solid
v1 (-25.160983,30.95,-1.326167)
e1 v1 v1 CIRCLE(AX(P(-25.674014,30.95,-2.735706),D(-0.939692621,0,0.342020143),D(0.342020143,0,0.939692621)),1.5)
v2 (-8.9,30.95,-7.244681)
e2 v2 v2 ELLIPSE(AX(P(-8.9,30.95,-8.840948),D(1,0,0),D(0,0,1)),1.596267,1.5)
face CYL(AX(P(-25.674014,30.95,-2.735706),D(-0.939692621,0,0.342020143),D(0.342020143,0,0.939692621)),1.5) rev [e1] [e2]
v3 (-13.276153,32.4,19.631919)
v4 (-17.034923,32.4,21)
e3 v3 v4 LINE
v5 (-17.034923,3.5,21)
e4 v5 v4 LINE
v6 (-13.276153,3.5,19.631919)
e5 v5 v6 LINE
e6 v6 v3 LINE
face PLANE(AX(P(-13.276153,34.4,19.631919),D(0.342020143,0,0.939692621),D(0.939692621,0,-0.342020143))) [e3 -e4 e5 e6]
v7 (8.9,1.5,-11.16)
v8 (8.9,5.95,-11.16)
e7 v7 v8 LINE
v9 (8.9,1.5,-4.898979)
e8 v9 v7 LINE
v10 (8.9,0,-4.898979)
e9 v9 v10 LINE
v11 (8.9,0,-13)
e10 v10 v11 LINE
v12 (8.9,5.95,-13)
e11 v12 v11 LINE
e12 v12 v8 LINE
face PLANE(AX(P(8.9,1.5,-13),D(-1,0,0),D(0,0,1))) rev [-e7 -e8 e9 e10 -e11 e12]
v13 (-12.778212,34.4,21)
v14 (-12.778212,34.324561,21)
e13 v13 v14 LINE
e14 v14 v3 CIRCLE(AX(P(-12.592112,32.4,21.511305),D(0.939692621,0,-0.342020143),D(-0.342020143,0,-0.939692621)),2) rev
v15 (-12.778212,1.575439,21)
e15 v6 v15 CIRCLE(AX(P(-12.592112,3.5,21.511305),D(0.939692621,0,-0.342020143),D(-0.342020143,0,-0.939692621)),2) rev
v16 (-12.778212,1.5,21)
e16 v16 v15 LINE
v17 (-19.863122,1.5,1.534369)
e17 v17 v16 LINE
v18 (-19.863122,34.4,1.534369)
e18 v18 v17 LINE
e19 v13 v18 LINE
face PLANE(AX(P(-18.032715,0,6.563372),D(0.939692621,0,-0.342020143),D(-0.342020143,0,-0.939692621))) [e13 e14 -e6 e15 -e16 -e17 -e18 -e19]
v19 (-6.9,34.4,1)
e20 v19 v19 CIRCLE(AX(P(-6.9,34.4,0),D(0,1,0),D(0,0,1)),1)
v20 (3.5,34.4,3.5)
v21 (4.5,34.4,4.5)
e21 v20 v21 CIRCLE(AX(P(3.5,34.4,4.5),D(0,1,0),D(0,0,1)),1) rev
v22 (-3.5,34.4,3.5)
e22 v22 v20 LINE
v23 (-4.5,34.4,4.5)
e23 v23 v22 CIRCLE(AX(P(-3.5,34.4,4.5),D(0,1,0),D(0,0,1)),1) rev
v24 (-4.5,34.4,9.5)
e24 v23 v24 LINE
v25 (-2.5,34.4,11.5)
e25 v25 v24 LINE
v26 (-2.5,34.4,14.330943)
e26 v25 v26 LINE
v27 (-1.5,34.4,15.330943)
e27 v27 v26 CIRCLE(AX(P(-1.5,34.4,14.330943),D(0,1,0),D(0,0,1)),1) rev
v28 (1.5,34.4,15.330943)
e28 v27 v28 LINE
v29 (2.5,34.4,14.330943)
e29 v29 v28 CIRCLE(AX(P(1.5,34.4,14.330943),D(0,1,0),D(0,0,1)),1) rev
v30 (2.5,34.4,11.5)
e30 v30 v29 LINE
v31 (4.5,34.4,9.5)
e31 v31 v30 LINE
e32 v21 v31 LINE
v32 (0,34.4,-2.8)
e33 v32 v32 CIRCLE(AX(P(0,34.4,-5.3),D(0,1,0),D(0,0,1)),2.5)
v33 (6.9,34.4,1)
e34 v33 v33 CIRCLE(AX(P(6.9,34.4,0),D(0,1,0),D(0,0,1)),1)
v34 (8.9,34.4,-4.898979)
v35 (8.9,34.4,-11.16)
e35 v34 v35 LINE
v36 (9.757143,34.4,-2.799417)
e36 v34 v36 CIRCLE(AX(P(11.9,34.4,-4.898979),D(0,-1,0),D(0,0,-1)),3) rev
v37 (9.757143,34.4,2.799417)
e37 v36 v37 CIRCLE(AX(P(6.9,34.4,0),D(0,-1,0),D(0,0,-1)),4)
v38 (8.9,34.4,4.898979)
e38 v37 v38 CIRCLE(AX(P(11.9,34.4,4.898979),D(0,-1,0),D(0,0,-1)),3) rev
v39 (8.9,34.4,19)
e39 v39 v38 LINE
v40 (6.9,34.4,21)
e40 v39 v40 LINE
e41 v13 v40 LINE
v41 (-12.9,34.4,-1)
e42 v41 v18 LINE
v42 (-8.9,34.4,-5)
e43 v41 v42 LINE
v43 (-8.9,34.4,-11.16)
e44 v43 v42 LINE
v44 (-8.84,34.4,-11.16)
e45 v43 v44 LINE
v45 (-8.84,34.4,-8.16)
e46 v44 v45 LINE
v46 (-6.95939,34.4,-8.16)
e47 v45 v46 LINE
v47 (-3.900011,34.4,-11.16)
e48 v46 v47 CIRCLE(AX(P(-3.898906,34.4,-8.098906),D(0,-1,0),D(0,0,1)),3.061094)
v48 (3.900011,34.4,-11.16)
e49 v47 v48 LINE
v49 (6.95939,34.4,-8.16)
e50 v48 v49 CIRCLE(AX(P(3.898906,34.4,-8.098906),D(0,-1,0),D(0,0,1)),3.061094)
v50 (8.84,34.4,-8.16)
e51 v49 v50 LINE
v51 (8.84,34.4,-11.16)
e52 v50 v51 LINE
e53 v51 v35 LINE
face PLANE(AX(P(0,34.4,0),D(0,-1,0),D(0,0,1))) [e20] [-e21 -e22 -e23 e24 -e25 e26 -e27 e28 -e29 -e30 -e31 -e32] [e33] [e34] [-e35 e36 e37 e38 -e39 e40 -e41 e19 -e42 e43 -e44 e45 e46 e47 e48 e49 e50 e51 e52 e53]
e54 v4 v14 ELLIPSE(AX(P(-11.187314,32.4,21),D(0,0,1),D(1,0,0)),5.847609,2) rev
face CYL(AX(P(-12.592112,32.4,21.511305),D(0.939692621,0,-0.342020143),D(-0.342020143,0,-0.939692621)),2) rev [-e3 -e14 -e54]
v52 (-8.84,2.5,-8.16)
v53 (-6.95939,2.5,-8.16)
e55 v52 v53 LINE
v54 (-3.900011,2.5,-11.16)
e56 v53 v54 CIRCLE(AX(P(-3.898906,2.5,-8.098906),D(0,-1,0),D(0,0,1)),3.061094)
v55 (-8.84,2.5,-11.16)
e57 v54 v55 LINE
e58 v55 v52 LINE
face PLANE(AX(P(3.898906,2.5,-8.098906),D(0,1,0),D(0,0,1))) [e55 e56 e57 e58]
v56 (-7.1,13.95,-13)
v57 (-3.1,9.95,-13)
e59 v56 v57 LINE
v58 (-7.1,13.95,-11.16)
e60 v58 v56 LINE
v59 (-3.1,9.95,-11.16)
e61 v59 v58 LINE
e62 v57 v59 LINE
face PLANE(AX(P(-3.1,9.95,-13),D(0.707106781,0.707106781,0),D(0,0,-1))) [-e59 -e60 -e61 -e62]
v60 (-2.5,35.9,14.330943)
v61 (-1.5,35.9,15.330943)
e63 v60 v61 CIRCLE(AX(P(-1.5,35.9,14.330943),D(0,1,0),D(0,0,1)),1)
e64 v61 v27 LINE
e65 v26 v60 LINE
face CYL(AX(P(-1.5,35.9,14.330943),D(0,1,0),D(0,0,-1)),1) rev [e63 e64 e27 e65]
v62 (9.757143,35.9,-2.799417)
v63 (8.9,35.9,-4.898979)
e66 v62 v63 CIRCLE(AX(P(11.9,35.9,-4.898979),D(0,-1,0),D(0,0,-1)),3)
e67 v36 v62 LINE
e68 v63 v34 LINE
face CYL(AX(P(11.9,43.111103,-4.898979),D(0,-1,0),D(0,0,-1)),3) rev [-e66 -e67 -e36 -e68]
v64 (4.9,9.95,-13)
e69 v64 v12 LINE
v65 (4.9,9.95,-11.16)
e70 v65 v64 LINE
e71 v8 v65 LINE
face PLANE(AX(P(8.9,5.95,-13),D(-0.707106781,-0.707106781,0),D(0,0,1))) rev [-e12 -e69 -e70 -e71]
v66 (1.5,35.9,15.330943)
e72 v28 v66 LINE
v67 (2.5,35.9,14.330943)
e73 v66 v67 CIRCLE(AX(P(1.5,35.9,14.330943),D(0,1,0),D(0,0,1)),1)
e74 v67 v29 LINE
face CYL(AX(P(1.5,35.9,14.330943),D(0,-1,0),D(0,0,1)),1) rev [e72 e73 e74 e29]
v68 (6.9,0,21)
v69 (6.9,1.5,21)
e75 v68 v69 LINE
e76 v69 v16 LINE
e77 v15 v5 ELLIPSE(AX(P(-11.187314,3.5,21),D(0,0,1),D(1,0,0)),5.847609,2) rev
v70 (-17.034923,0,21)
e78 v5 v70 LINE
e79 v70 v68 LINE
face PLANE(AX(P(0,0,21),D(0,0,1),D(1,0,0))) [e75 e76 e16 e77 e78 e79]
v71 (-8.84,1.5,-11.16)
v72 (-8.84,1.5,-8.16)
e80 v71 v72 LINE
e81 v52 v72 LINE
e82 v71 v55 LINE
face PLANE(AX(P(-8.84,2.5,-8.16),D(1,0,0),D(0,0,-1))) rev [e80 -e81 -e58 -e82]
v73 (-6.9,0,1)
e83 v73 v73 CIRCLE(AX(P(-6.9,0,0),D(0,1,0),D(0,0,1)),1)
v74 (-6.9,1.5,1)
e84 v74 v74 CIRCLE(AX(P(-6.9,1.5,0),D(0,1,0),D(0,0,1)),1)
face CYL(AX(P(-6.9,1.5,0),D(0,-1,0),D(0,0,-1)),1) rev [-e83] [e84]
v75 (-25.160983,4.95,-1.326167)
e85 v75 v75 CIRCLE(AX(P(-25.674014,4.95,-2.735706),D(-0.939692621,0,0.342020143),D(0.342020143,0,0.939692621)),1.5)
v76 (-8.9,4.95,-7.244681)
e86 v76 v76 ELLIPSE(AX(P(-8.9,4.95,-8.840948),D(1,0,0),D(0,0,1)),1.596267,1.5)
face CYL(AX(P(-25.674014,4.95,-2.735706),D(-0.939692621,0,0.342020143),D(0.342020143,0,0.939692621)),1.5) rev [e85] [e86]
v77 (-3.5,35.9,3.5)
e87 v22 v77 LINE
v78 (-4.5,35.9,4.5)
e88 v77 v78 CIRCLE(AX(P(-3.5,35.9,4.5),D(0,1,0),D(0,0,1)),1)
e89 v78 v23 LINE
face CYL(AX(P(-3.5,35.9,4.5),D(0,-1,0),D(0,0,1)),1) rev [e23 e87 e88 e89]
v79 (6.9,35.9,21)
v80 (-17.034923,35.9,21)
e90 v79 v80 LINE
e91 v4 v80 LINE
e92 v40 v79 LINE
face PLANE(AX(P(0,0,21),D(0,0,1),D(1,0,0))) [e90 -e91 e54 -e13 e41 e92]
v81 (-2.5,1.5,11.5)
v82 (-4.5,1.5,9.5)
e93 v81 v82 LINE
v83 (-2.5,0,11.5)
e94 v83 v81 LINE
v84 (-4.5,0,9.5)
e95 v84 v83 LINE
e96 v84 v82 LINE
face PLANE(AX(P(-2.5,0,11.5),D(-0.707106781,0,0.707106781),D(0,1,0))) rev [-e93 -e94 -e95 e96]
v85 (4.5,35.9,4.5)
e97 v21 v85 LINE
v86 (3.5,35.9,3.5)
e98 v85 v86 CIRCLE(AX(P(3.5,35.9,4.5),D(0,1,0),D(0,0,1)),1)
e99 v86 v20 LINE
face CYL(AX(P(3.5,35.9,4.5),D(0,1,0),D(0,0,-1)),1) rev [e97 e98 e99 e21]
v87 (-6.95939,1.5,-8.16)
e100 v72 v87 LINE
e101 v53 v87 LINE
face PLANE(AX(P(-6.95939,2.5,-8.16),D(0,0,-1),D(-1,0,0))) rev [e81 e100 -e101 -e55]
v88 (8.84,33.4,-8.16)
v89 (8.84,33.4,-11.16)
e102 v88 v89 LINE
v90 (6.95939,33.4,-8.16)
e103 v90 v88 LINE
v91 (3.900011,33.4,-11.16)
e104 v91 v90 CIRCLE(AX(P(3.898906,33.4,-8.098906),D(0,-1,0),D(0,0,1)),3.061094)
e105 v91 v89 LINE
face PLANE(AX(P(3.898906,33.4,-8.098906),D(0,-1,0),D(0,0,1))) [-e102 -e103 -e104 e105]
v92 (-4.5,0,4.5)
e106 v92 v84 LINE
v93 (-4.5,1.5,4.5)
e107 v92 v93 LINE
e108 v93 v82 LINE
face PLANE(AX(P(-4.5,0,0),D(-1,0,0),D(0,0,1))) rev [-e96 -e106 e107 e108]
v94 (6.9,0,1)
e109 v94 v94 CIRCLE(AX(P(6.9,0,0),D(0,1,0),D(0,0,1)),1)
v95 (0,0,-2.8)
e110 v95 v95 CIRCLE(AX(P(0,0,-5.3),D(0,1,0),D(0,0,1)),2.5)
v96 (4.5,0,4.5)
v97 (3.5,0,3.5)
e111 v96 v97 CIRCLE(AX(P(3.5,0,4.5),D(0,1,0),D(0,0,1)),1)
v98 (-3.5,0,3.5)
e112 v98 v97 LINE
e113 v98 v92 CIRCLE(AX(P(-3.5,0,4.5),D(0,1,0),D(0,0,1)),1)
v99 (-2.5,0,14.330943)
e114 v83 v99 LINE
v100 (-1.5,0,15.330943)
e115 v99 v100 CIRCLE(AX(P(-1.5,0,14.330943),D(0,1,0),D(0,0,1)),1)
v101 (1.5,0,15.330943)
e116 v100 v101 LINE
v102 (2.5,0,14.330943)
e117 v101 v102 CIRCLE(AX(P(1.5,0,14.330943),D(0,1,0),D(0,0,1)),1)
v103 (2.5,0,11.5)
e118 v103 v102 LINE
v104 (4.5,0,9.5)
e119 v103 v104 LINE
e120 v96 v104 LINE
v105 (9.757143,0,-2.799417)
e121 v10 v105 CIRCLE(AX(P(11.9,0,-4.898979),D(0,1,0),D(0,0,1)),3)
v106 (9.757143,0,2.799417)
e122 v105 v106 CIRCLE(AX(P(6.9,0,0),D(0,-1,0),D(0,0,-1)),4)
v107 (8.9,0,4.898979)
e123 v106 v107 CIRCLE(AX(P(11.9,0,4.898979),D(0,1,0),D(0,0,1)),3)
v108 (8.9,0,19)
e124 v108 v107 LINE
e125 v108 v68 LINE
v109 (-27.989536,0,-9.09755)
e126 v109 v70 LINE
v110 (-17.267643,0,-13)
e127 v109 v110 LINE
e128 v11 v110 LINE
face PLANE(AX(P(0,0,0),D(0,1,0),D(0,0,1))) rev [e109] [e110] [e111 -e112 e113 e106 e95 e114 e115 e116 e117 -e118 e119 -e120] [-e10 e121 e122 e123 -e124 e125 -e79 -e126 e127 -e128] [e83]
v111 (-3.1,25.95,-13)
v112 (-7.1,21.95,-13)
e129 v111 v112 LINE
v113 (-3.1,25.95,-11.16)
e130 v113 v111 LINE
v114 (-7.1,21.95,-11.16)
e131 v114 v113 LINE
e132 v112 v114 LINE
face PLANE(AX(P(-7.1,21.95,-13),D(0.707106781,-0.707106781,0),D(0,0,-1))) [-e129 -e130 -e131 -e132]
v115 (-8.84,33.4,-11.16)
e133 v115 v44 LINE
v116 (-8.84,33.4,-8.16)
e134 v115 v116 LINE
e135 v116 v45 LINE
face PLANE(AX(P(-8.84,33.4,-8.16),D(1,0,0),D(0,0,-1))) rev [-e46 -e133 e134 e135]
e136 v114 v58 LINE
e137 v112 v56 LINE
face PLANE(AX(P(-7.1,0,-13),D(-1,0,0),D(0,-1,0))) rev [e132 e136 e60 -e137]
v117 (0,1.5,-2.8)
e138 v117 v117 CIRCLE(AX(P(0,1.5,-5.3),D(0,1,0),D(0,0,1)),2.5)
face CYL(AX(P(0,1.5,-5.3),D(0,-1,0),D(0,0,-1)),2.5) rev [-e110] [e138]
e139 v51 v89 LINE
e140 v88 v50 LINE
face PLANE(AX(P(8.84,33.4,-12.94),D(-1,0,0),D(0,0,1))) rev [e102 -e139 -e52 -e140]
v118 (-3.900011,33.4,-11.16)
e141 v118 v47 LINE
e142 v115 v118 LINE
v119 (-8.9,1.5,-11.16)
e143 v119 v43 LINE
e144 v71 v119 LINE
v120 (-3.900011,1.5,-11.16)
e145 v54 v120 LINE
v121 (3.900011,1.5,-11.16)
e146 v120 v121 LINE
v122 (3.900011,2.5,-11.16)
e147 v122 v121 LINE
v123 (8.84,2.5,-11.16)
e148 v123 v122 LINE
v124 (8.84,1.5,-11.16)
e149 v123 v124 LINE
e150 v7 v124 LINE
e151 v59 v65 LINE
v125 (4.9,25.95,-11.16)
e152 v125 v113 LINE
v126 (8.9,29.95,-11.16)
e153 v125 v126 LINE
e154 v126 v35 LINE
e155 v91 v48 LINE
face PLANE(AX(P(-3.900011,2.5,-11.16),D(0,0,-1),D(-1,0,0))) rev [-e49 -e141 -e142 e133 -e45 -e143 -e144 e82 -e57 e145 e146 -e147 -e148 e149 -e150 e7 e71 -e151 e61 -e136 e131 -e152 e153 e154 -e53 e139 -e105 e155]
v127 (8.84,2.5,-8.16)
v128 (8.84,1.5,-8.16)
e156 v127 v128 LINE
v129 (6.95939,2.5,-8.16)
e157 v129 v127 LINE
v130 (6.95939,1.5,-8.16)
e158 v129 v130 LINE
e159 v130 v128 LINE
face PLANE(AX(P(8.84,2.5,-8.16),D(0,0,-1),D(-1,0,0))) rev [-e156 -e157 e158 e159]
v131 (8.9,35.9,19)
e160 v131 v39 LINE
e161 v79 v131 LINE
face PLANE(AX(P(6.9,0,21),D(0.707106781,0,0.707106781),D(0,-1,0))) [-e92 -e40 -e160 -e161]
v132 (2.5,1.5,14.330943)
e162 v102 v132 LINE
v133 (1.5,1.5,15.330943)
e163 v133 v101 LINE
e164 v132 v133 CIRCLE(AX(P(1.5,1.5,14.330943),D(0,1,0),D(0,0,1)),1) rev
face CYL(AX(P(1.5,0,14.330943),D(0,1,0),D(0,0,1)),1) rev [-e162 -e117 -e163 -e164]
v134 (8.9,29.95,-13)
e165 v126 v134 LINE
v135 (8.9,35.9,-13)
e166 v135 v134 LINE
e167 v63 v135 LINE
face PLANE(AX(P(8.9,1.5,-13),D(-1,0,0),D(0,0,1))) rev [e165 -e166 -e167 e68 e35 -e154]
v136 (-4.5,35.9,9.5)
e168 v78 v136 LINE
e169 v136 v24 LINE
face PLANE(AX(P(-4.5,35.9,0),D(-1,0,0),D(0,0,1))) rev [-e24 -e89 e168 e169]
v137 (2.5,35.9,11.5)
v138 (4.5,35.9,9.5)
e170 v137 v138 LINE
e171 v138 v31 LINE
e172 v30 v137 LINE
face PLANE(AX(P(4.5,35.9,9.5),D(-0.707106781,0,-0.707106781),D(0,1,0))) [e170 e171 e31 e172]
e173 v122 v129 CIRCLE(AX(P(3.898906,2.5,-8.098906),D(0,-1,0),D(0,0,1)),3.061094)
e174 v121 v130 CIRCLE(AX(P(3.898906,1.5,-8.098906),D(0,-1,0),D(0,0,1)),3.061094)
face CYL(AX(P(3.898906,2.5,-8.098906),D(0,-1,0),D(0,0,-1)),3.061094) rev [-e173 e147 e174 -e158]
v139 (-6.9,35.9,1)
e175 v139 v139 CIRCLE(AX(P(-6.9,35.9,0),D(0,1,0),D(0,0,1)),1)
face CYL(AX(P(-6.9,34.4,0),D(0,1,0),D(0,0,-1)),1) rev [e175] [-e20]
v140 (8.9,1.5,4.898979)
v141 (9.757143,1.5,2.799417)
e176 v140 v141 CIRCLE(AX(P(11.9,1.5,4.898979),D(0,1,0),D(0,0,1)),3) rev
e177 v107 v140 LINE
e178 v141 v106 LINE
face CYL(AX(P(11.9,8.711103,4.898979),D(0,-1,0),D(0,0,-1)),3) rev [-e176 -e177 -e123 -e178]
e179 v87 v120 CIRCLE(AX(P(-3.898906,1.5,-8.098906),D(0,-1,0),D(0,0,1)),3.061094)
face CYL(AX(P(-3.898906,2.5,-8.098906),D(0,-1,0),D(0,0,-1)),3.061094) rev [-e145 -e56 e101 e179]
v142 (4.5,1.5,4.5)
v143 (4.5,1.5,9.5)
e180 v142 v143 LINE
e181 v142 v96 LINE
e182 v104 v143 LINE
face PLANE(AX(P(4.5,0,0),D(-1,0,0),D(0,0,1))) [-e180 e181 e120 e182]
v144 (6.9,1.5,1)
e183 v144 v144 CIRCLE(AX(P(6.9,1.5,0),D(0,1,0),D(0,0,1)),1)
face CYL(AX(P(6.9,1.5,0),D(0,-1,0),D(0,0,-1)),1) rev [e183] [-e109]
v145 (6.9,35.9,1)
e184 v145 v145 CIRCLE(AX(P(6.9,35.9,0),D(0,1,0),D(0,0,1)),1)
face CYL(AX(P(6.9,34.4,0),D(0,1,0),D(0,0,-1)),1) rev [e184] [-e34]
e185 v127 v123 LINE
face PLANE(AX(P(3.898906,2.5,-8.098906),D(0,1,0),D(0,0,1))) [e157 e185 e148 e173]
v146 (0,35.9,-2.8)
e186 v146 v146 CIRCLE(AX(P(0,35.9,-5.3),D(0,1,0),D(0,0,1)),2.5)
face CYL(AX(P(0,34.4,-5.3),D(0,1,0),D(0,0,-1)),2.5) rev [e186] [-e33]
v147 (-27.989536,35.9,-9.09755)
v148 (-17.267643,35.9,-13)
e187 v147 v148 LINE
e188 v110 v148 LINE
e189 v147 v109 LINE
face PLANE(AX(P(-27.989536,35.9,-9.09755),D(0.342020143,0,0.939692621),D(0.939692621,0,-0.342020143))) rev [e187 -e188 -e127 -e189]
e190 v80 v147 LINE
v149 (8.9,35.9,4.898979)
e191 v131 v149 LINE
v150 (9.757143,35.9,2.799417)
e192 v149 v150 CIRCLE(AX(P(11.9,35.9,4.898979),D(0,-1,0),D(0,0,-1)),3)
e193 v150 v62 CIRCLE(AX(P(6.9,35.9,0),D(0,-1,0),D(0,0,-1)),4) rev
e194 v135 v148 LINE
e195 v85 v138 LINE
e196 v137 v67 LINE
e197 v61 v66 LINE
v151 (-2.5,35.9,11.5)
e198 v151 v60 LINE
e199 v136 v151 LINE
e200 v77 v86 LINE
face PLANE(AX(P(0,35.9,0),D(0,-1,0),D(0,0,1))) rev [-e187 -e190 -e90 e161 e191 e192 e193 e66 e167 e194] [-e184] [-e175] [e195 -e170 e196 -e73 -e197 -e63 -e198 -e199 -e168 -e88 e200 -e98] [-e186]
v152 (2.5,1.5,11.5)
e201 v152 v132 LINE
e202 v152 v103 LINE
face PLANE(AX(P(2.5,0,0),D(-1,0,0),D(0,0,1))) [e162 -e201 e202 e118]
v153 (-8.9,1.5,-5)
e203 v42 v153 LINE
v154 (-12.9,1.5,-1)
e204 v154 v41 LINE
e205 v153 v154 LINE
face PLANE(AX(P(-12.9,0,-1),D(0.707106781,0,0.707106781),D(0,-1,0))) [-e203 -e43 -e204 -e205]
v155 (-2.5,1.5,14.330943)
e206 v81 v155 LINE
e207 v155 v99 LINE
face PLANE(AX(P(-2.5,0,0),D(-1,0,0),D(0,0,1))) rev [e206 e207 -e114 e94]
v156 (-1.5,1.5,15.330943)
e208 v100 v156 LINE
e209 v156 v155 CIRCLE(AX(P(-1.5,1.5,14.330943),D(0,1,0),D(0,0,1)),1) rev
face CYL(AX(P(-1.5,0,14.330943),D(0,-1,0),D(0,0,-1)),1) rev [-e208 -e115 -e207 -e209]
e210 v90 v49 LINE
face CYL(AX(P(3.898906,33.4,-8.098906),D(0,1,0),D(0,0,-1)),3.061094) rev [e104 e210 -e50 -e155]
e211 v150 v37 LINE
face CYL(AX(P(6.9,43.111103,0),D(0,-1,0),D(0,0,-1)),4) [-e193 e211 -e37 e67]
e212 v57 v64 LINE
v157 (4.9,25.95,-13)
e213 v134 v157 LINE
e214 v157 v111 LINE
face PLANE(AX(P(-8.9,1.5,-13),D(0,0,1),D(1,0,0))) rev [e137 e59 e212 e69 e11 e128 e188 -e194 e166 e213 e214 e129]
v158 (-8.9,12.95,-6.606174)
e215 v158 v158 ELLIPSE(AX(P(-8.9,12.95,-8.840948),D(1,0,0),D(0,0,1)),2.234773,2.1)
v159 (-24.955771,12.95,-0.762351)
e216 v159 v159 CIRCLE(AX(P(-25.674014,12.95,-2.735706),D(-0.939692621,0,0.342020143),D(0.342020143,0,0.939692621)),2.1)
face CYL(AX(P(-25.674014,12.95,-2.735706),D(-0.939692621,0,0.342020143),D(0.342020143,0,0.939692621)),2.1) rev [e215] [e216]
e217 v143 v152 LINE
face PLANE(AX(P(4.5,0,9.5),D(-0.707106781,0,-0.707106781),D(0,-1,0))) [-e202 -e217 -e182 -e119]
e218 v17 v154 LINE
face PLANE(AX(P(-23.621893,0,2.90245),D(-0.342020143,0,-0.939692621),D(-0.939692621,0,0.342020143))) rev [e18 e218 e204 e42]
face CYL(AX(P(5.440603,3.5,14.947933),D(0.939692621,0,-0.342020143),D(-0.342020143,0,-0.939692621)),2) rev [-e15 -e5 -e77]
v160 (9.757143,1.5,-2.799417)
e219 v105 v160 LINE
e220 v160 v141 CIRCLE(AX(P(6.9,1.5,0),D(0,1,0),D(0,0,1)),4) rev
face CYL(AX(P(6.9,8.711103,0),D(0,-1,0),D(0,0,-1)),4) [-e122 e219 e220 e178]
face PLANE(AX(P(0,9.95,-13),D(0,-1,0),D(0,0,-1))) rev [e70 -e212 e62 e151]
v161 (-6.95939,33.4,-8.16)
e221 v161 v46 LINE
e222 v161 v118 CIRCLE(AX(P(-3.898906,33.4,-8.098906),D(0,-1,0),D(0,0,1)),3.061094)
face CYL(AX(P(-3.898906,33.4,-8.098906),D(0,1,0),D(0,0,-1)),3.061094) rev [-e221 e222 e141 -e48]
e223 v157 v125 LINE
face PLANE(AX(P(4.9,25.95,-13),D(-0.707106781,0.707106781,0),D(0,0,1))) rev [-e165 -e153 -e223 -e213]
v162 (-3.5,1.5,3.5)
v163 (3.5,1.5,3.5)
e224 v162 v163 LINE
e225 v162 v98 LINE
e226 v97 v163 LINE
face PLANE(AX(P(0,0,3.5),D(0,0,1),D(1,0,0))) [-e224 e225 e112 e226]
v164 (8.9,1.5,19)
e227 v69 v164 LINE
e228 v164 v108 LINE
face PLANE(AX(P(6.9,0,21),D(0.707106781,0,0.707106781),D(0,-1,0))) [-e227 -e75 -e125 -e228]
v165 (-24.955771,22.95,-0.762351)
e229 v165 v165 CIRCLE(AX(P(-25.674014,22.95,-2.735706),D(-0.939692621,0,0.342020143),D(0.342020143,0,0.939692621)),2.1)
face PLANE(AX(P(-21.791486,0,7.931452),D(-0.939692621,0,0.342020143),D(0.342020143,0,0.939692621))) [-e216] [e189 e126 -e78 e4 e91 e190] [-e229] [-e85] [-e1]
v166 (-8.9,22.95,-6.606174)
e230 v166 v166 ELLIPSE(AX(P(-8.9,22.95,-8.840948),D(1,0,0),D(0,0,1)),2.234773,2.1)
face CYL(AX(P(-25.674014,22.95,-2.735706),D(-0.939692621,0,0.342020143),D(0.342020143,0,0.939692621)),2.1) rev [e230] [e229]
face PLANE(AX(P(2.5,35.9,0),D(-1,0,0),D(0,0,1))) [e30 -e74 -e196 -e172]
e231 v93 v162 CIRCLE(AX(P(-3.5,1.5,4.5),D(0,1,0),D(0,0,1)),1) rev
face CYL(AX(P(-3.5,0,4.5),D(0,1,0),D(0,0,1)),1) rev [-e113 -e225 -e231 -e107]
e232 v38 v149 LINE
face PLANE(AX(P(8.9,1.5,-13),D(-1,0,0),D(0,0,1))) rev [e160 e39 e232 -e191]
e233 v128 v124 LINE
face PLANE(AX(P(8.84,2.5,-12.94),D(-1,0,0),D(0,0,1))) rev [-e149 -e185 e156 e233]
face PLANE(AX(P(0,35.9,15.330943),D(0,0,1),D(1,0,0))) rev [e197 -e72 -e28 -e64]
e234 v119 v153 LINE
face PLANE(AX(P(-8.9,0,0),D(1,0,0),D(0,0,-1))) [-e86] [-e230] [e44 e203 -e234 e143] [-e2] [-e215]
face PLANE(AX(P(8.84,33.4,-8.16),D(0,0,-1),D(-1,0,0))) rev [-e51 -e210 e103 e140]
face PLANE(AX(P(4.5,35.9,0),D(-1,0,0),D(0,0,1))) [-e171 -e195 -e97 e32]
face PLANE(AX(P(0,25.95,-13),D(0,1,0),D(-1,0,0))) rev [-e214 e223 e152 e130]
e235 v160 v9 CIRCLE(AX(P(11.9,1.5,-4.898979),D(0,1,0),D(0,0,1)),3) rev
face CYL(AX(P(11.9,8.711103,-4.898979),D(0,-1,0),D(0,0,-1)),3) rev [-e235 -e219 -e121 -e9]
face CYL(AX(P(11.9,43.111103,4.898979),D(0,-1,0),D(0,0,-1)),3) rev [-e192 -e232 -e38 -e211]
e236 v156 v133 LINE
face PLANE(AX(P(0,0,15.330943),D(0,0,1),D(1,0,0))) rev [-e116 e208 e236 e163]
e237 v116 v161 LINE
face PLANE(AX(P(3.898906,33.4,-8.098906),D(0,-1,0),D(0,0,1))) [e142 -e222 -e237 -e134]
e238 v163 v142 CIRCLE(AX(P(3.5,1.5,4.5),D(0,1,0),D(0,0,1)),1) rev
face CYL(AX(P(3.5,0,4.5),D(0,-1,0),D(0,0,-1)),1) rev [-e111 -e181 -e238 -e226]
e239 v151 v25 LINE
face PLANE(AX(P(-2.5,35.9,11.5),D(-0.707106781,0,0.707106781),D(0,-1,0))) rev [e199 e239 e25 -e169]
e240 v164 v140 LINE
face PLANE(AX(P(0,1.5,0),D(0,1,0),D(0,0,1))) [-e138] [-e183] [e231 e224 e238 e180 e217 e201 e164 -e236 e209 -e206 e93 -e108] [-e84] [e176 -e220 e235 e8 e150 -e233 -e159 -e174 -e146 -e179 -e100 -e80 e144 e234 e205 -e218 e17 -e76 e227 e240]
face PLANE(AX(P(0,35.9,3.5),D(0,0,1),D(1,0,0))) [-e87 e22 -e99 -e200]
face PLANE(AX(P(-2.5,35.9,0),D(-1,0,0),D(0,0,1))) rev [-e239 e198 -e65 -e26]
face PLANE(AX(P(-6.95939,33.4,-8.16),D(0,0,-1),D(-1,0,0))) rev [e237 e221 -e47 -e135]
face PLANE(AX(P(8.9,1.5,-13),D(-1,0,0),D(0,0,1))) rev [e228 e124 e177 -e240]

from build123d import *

# Parameters (mm, degrees)
SKETCH1_W                  = 17.8
SKETCH1_H                  = 30
SKETCH1_R                  = 1
SKETCH1_R_2                = 2.5
BOSS_EXTRUDE1_DEPTH        = 1.5
SKETCH2_W                  = 9
SKETCH2_H                  = 6
SKETCH2_W_2                = 5
SKETCH2_H_2                = 5.830943002
CUT_EXTRUDE1_DEPTH         = 20.247337478
CHAMFER1_SIZE              = 2
FILLET1_R                  = 1
BOSS_EXTRUDE2_DEPTH        = 1
SKETCH4_W                  = 12
SKETCH4_H                  = 17.95
BOSS_EXTRUDE3_DEPTH        = 4
BOSS_EXTRUDE4_DEPTH        = 35.9
SKETCH6_W                  = 12.770133269
SKETCH6_H                  = 35.9
BOSS_EXTRUDE5_DEPTH        = 11.41
F_3_0_MM_DOWEL_HOLES1_D    = 3
F_4_2_4_2_DIAMETER_HOLE1_D = 4.2
SKETCH12_W                 = 17.8
SKETCH12_H                 = 1.5
BOSS_EXTRUDE6_DEPTH        = 4
CHAMFER2_SIZE              = 2
SKETCH13_W                 = 26.167642811
SKETCH13_H                 = 35.9
BOSS_EXTRUDE7_DEPTH        = 1.840000002
CHAMFER3_SIZE              = 4
CHAMFER4_SIZE              = 4
SKETCH14_W                 = 16
SKETCH14_H                 = 8
CUT_EXTRUDE2_DEPTH         = 56.735892419
CHAMFER5_SIZE              = 4
BOSS_EXTRUDE8_DEPTH        = 1.5
BOSS_EXTRUDE9_START        = -34.4
BOSS_EXTRUDE9_DEPTH        = 1.5
FILLET2_R                  = 3
BOSS_EXTRUDE10_START       = -1.5
BOSS_EXTRUDE10_DEPTH       = 1.5
BOSS_EXTRUDE11_START       = -35.9
BOSS_EXTRUDE11_DEPTH       = 1.5
SKETCH18_W                 = 19.259010622
SKETCH18_H                 = 32.9
BOSS_EXTRUDE12_DEPTH       = 4
FILLET3_R                  = 2


# Some blends are built 0.0001 mm under size
with BuildPart() as part:
    # Sketch1 → Boss-Extrude1 (new body)
    with BuildSketch(Plane(origin=(0, 0, 0), x_dir=(1, 0, 0), z_dir=(0, 1, 0))):
        with Locations((0, -2)):
            Rectangle(SKETCH1_W, SKETCH1_H)
        with Locations(Location((-6.9, 0, 0), (0, 0, 270))):
            Circle(SKETCH1_R, mode=Mode.SUBTRACT)
        with Locations(Location((6.9, 0, 0), (0, 0, 270))):
            Circle(SKETCH1_R, mode=Mode.SUBTRACT)
        with Locations(Location((0, 5.3, 0), (0, 0, 270))):
            Circle(SKETCH1_R_2, mode=Mode.SUBTRACT)
    extrude(amount=BOSS_EXTRUDE1_DEPTH)

    # Sketch2 → Cut-Extrude1 (cut, through all)
    with BuildSketch(Plane(origin=(0, 1.5, 0), x_dir=(1, 0, 0), z_dir=(0, 1, 0))):
        with Locations((0, -6.5)):
            Rectangle(SKETCH2_W, SKETCH2_H)
        with Locations((0, -12.415471501)):
            Rectangle(SKETCH2_W_2, SKETCH2_H_2)
    extrude(amount=-CUT_EXTRUDE1_DEPTH, mode=Mode.SUBTRACT)

    # Chamfer1
    chamfer1_edges = [part.edges().sort_by_distance(p)[0] for p in [
        (2.5, 0.75, 9.5),
        (-2.5, 0.75, 9.5),
    ]]
    chamfer(chamfer1_edges, length=CHAMFER1_SIZE - 0.0001)  # a hair under: the kernel refuses the full size

    # Fillet1
    fillet1_edges = [part.edges().sort_by_distance(p)[0] for p in [
        (4.5, 0.75, 3.5),
        (2.5, 0.75, 15.330943002),
        (-2.5, 0.75, 15.330943002),
        (-4.5, 0.75, 3.5),
    ]]
    fillet(fillet1_edges, radius=FILLET1_R)

    # Sketch3 → Boss-Extrude2 (add)
    with BuildSketch(Plane(origin=(0, 1.5, 0), x_dir=(1, 0, 0), z_dir=(0, 1, 0))):
        with BuildLine():
            Line((8.84, 8.16), (6.959390471, 8.16))
            ThreePointArc((6.959390471, 8.16), (6.042112051, 10.284532913), (3.900010938, 11.159999998))
            Line((3.900010938, 11.159999998), (-3.900010938, 11.159999998))
            ThreePointArc((-3.900010938, 11.159999998), (-6.04211205, 10.284532912), (-6.959390471, 8.16))
            Line((-6.959390471, 8.16), (-8.84, 8.16))
            Line((-8.84, 8.16), (-8.84, 12.94))
            Line((-8.84, 12.94), (8.84, 12.94))
            Line((8.84, 12.94), (8.84, 8.16))
        make_face()
    extrude(amount=BOSS_EXTRUDE2_DEPTH)

    # Sketch4 → Boss-Extrude3 (add)
    with BuildSketch(Plane.ZY.offset(8.9)):
        with Locations((-7, 8.975)):
            Rectangle(SKETCH4_W, SKETCH4_H)
    extrude(amount=BOSS_EXTRUDE3_DEPTH)

    # Mirror2: part across plane


with BuildPart() as part_1:
    add(part.part)
    add(part.part.mirror(Plane.ZX.offset(17.95)))

    # Sketch5 → Boss-Extrude4 (add)
    with BuildSketch(Plane(origin=(0, 35.9, 0), x_dir=(1, 0, 0), z_dir=(0, 1, 0))):
        Polygon((-12.9, 1), (-17.267642811, 13), (-12.9, 13), align=None)
    extrude(amount=-BOSS_EXTRUDE4_DEPTH)

    # Sketch6 → Boss-Extrude5 (add)
    with BuildSketch(Plane(origin=(-11.069592853, 0, 4.029002304), x_dir=(0.3420201433256634, 0, 0.9396926207859103), z_dir=(-0.9396926207859103, 0, 0.3420201433256634))):
        with Locations((-11.736819105, 17.95)):
            Rectangle(SKETCH6_W, SKETCH6_H)
    extrude(amount=BOSS_EXTRUDE5_DEPTH)

    # Ø3.0 mm Dowel Holes1 (through all)
    with Locations(Plane(origin=(-23.72675034, 0, 2.614356121), x_dir=(-0.34202014332566333, 0, -0.9396926207859103), z_dir=(-0.9396926207859104, 0, 0.3420201433256634))):
        with Locations((5.693417073, -4.95), (5.693417073, -30.95)):
            Hole(F_3_0_MM_DOWEL_HOLES1_D / 2)

    # Ø4.2 (4.2) Diameter Hole1 (through all)
    with Locations(Plane(origin=(-21.791485656, 0, 7.931452139), x_dir=(0.34202014332566333, 0, 0.9396926207859103), z_dir=(-0.9396926207859104, 0, 0.3420201433256634))):
        with Locations((-11.35175247, 12.95), (-11.35175247, 22.95)):
            Hole(F_4_2_4_2_DIAMETER_HOLE1_D / 2)

    # Sketch12 → Boss-Extrude6 (add)
    with BuildSketch(Plane.XY.offset(17)):
        with Locations((0, 35.15)):
            Rectangle(SKETCH12_W, SKETCH12_H)
        with Locations((0, 0.75)):
            Rectangle(SKETCH12_W, SKETCH12_H)
    extrude(amount=BOSS_EXTRUDE6_DEPTH)

    # Chamfer2
    chamfer2_edges = [part_1.edges().sort_by_distance(p)[0] for p in [
        (8.9, 35.15, 21),
        (-8.9, 35.15, 21),
        (-8.9, 0.75, 21),
        (8.9, 0.75, 21),
    ]]
    chamfer(chamfer2_edges, length=CHAMFER2_SIZE)

    # Sketch13 → Boss-Extrude7 (add)
    with BuildSketch(Plane(origin=(0, 0, -13), x_dir=(-1, 0, 0), z_dir=(0, 0, -1))):
        with Locations((4.183821406, 17.95)):
            Rectangle(SKETCH13_W, SKETCH13_H)
    extrude(amount=-BOSS_EXTRUDE7_DEPTH)

    # Chamfer3
    # the kernel refuses this chamfer: 4 mm, written as the material it adds along each edge
    with BuildSketch(Plane(origin=(-8.9, 0, -1), x_dir=(-0.9996219169112968, 0, -0.027495876610586216), z_dir=(0, 1, 0)), Plane(origin=(-8.9, 35.9, -1), x_dir=(0.027495876610586924, 0, 0.9996219169112968), z_dir=(0, -1, 0))) as chamfer3_piece_1:
        Polygon((CHAMFER3_SIZE * 0.999621916911, CHAMFER3_SIZE * 0.0274958766106), (-CHAMFER3_SIZE * 0.0274958766106, CHAMFER3_SIZE * 0.999621916911), (0, 0), align=None)
    extrude(amount=1.5)

    # Chamfer4
    chamfer4_edges = [part_1.edges().sort_by_distance(p)[0] for p in [
        (-8.9, 17.95, -1),
    ]]
    chamfer(chamfer4_edges, length=CHAMFER4_SIZE - 0.0001)  # a hair under: the kernel refuses the full size

    # Sketch14 → Cut-Extrude2 (cut, through all)
    with BuildSketch(Plane.XY.offset(-11.159999998)):
        with Locations((0.9, 21.95)):
            Rectangle(SKETCH14_W, SKETCH14_H)
        with Locations((0.9, 13.95)):
            Rectangle(SKETCH14_W, SKETCH14_H)
    extrude(amount=-CUT_EXTRUDE2_DEPTH, mode=Mode.SUBTRACT)

    # Chamfer5
    chamfer5_edges = [part_1.edges().sort_by_distance(p)[0] for p in [
        (-7.1, 9.95, -12.079999999),
        (-7.1, 25.95, -12.079999999),
        (8.9, 25.95, -12.079999999),
        (8.9, 9.95, -12.079999999),
    ]]
    chamfer(chamfer5_edges, length=CHAMFER5_SIZE)

    # Sketch15 → Boss-Extrude8 (add)
    with BuildSketch(Plane.XZ):
        with BuildLine():
            Line((8.9, 3.464101615), (8.9, -3.464101615))
            ThreePointArc((8.9, -3.464101615), (10.9, 0), (8.9, 3.464101615))
        make_face()
    extrude(amount=-BOSS_EXTRUDE8_DEPTH)

    # Sketch15<2> → Boss-Extrude9 (add)
    with BuildSketch(Plane.XZ.offset(BOSS_EXTRUDE9_START)):
        with BuildLine():
            Line((8.9, 3.464101615), (8.9, -3.464101615))
            ThreePointArc((8.9, -3.464101615), (10.9, 0), (8.9, 3.464101615))
        make_face()
    extrude(amount=-BOSS_EXTRUDE9_DEPTH)

    # Fillet2
    fillet2_edges = [part_1.edges().sort_by_distance(p)[0] for p in [
        (-12.9, 0.75, -1),
        (-12.9, 35.15, -1),
        (-8.9, 0.75, 3),
        (-8.9, 35.15, 3),
        (8.9, 0.75, -3.464101615),
        (8.9, 0.75, 3.464101615),
        (8.9, 35.15, 3.464101615),
        (8.9, 35.15, -3.464101615),
    ]]
    fillet(fillet2_edges, radius=FILLET2_R)

    # Sketch16 → Boss-Extrude10 (add)
    with BuildSketch(Plane(origin=(0, 35.9, 0), x_dir=(1, 0, 0), z_dir=(0, 1, 0)).offset(BOSS_EXTRUDE10_START)):
        with BuildLine():
            Line((-8.9, -4.242640687), (-8.9, -19))
            Line((-8.9, -19), (-6.9, -21))
            Line((-6.9, -21), (-17.03492323, -21))
            Line((-17.03492323, -21), (-23.621892803, -2.902449835))
            Line((-23.621892803, -2.902449835), (-14.695950669, 0.346327414))
            ThreePointArc((-14.695950669, 0.346327414), (-13.020571397, 0.456137573), (-11.548569895, -0.351430105))
            Line((-11.548569895, -0.351430105), (-9.778679656, -2.121320344))
            ThreePointArc((-9.778679656, -2.121320344), (-9.128361402, -3.09459039), (-8.9, -4.242640687))
        make_face()
    extrude(amount=BOSS_EXTRUDE10_DEPTH)

    # Sketch16<2> → Boss-Extrude11 (add)
    with BuildSketch(Plane(origin=(0, 35.9, 0), x_dir=(1, 0, 0), z_dir=(0, 1, 0)).offset(BOSS_EXTRUDE11_START)):
        with BuildLine():
            Line((-8.9, -4.242640687), (-8.9, -19))
            Line((-8.9, -19), (-6.9, -21))
            Line((-6.9, -21), (-17.03492323, -21))
            Line((-17.03492323, -21), (-23.621892803, -2.902449835))
            Line((-23.621892803, -2.902449835), (-14.695950669, 0.346327414))
            ThreePointArc((-14.695950669, 0.346327414), (-13.020571397, 0.456137573), (-11.548569895, -0.351430105))
            Line((-11.548569895, -0.351430105), (-9.778679656, -2.121320344))
            ThreePointArc((-9.778679656, -2.121320344), (-9.128361402, -3.09459039), (-8.9, -4.242640687))
        make_face()
    extrude(amount=BOSS_EXTRUDE11_DEPTH)

    # Sketch18 → Boss-Extrude12 (add)
    with BuildSketch(Plane(origin=(-21.791485656, 0, 7.931452139), x_dir=(0.34202014332566333, 0, 0.9396926207859103), z_dir=(-0.9396926207859104, 0, 0.3420201433256634))):
        with Locations((4.277752841, 17.95)):
            Rectangle(SKETCH18_W, SKETCH18_H)
    extrude(amount=-BOSS_EXTRUDE12_DEPTH)

    # Fillet3
    # the kernel refuses this fillet: 2 mm, written as the material it adds along each edge
    with BuildSketch(Plane(origin=(-21.733386334, 34.4, 22.710100717), x_dir=(0.3420201433256634, 0, 0.9396926207859104), z_dir=(0.9396926207859104, 0, -0.3420201433256634))) as fillet3_piece_1_section:
        with BuildLine():
            CenterArc((FILLET3_R, FILLET3_R), FILLET3_R, 180, 90)
            Line((0, FILLET3_R), (0, 0))
            Line((0, 0), (FILLET3_R, 0))
        make_face()
    fillet3_piece_1 = extrude(amount=9, mode=Mode.PRIVATE)
    fillet3_piece_1 = split(fillet3_piece_1, bisect_by=Plane(origin=(-14.648893953, 33.872369462, 21), z_dir=(0, 0, -1)), keep=Keep.TOP, mode=Mode.PRIVATE)
    add(fillet3_piece_1)
    with BuildSketch(Plane(origin=(-21.733386334, 1.5, 22.710100717), x_dir=(0, 1, 0), z_dir=(0.9396926207859104, 0, -0.3420201433256634))) as fillet3_piece_2_section:
        with BuildLine():
            CenterArc((FILLET3_R, FILLET3_R), FILLET3_R, 180, 90)
            Line((0, FILLET3_R), (0, 0))
            Line((0, 0), (FILLET3_R, 0))
        make_face()
    fillet3_piece_2 = extrude(amount=9, mode=Mode.PRIVATE)
    fillet3_piece_2 = split(fillet3_piece_2, bisect_by=Plane(origin=(-14.648893954, 2.027630538, 21), z_dir=(0, 0, -1)), keep=Keep.TOP, mode=Mode.PRIVATE)
    add(fillet3_piece_2)


solid = part_1.part
